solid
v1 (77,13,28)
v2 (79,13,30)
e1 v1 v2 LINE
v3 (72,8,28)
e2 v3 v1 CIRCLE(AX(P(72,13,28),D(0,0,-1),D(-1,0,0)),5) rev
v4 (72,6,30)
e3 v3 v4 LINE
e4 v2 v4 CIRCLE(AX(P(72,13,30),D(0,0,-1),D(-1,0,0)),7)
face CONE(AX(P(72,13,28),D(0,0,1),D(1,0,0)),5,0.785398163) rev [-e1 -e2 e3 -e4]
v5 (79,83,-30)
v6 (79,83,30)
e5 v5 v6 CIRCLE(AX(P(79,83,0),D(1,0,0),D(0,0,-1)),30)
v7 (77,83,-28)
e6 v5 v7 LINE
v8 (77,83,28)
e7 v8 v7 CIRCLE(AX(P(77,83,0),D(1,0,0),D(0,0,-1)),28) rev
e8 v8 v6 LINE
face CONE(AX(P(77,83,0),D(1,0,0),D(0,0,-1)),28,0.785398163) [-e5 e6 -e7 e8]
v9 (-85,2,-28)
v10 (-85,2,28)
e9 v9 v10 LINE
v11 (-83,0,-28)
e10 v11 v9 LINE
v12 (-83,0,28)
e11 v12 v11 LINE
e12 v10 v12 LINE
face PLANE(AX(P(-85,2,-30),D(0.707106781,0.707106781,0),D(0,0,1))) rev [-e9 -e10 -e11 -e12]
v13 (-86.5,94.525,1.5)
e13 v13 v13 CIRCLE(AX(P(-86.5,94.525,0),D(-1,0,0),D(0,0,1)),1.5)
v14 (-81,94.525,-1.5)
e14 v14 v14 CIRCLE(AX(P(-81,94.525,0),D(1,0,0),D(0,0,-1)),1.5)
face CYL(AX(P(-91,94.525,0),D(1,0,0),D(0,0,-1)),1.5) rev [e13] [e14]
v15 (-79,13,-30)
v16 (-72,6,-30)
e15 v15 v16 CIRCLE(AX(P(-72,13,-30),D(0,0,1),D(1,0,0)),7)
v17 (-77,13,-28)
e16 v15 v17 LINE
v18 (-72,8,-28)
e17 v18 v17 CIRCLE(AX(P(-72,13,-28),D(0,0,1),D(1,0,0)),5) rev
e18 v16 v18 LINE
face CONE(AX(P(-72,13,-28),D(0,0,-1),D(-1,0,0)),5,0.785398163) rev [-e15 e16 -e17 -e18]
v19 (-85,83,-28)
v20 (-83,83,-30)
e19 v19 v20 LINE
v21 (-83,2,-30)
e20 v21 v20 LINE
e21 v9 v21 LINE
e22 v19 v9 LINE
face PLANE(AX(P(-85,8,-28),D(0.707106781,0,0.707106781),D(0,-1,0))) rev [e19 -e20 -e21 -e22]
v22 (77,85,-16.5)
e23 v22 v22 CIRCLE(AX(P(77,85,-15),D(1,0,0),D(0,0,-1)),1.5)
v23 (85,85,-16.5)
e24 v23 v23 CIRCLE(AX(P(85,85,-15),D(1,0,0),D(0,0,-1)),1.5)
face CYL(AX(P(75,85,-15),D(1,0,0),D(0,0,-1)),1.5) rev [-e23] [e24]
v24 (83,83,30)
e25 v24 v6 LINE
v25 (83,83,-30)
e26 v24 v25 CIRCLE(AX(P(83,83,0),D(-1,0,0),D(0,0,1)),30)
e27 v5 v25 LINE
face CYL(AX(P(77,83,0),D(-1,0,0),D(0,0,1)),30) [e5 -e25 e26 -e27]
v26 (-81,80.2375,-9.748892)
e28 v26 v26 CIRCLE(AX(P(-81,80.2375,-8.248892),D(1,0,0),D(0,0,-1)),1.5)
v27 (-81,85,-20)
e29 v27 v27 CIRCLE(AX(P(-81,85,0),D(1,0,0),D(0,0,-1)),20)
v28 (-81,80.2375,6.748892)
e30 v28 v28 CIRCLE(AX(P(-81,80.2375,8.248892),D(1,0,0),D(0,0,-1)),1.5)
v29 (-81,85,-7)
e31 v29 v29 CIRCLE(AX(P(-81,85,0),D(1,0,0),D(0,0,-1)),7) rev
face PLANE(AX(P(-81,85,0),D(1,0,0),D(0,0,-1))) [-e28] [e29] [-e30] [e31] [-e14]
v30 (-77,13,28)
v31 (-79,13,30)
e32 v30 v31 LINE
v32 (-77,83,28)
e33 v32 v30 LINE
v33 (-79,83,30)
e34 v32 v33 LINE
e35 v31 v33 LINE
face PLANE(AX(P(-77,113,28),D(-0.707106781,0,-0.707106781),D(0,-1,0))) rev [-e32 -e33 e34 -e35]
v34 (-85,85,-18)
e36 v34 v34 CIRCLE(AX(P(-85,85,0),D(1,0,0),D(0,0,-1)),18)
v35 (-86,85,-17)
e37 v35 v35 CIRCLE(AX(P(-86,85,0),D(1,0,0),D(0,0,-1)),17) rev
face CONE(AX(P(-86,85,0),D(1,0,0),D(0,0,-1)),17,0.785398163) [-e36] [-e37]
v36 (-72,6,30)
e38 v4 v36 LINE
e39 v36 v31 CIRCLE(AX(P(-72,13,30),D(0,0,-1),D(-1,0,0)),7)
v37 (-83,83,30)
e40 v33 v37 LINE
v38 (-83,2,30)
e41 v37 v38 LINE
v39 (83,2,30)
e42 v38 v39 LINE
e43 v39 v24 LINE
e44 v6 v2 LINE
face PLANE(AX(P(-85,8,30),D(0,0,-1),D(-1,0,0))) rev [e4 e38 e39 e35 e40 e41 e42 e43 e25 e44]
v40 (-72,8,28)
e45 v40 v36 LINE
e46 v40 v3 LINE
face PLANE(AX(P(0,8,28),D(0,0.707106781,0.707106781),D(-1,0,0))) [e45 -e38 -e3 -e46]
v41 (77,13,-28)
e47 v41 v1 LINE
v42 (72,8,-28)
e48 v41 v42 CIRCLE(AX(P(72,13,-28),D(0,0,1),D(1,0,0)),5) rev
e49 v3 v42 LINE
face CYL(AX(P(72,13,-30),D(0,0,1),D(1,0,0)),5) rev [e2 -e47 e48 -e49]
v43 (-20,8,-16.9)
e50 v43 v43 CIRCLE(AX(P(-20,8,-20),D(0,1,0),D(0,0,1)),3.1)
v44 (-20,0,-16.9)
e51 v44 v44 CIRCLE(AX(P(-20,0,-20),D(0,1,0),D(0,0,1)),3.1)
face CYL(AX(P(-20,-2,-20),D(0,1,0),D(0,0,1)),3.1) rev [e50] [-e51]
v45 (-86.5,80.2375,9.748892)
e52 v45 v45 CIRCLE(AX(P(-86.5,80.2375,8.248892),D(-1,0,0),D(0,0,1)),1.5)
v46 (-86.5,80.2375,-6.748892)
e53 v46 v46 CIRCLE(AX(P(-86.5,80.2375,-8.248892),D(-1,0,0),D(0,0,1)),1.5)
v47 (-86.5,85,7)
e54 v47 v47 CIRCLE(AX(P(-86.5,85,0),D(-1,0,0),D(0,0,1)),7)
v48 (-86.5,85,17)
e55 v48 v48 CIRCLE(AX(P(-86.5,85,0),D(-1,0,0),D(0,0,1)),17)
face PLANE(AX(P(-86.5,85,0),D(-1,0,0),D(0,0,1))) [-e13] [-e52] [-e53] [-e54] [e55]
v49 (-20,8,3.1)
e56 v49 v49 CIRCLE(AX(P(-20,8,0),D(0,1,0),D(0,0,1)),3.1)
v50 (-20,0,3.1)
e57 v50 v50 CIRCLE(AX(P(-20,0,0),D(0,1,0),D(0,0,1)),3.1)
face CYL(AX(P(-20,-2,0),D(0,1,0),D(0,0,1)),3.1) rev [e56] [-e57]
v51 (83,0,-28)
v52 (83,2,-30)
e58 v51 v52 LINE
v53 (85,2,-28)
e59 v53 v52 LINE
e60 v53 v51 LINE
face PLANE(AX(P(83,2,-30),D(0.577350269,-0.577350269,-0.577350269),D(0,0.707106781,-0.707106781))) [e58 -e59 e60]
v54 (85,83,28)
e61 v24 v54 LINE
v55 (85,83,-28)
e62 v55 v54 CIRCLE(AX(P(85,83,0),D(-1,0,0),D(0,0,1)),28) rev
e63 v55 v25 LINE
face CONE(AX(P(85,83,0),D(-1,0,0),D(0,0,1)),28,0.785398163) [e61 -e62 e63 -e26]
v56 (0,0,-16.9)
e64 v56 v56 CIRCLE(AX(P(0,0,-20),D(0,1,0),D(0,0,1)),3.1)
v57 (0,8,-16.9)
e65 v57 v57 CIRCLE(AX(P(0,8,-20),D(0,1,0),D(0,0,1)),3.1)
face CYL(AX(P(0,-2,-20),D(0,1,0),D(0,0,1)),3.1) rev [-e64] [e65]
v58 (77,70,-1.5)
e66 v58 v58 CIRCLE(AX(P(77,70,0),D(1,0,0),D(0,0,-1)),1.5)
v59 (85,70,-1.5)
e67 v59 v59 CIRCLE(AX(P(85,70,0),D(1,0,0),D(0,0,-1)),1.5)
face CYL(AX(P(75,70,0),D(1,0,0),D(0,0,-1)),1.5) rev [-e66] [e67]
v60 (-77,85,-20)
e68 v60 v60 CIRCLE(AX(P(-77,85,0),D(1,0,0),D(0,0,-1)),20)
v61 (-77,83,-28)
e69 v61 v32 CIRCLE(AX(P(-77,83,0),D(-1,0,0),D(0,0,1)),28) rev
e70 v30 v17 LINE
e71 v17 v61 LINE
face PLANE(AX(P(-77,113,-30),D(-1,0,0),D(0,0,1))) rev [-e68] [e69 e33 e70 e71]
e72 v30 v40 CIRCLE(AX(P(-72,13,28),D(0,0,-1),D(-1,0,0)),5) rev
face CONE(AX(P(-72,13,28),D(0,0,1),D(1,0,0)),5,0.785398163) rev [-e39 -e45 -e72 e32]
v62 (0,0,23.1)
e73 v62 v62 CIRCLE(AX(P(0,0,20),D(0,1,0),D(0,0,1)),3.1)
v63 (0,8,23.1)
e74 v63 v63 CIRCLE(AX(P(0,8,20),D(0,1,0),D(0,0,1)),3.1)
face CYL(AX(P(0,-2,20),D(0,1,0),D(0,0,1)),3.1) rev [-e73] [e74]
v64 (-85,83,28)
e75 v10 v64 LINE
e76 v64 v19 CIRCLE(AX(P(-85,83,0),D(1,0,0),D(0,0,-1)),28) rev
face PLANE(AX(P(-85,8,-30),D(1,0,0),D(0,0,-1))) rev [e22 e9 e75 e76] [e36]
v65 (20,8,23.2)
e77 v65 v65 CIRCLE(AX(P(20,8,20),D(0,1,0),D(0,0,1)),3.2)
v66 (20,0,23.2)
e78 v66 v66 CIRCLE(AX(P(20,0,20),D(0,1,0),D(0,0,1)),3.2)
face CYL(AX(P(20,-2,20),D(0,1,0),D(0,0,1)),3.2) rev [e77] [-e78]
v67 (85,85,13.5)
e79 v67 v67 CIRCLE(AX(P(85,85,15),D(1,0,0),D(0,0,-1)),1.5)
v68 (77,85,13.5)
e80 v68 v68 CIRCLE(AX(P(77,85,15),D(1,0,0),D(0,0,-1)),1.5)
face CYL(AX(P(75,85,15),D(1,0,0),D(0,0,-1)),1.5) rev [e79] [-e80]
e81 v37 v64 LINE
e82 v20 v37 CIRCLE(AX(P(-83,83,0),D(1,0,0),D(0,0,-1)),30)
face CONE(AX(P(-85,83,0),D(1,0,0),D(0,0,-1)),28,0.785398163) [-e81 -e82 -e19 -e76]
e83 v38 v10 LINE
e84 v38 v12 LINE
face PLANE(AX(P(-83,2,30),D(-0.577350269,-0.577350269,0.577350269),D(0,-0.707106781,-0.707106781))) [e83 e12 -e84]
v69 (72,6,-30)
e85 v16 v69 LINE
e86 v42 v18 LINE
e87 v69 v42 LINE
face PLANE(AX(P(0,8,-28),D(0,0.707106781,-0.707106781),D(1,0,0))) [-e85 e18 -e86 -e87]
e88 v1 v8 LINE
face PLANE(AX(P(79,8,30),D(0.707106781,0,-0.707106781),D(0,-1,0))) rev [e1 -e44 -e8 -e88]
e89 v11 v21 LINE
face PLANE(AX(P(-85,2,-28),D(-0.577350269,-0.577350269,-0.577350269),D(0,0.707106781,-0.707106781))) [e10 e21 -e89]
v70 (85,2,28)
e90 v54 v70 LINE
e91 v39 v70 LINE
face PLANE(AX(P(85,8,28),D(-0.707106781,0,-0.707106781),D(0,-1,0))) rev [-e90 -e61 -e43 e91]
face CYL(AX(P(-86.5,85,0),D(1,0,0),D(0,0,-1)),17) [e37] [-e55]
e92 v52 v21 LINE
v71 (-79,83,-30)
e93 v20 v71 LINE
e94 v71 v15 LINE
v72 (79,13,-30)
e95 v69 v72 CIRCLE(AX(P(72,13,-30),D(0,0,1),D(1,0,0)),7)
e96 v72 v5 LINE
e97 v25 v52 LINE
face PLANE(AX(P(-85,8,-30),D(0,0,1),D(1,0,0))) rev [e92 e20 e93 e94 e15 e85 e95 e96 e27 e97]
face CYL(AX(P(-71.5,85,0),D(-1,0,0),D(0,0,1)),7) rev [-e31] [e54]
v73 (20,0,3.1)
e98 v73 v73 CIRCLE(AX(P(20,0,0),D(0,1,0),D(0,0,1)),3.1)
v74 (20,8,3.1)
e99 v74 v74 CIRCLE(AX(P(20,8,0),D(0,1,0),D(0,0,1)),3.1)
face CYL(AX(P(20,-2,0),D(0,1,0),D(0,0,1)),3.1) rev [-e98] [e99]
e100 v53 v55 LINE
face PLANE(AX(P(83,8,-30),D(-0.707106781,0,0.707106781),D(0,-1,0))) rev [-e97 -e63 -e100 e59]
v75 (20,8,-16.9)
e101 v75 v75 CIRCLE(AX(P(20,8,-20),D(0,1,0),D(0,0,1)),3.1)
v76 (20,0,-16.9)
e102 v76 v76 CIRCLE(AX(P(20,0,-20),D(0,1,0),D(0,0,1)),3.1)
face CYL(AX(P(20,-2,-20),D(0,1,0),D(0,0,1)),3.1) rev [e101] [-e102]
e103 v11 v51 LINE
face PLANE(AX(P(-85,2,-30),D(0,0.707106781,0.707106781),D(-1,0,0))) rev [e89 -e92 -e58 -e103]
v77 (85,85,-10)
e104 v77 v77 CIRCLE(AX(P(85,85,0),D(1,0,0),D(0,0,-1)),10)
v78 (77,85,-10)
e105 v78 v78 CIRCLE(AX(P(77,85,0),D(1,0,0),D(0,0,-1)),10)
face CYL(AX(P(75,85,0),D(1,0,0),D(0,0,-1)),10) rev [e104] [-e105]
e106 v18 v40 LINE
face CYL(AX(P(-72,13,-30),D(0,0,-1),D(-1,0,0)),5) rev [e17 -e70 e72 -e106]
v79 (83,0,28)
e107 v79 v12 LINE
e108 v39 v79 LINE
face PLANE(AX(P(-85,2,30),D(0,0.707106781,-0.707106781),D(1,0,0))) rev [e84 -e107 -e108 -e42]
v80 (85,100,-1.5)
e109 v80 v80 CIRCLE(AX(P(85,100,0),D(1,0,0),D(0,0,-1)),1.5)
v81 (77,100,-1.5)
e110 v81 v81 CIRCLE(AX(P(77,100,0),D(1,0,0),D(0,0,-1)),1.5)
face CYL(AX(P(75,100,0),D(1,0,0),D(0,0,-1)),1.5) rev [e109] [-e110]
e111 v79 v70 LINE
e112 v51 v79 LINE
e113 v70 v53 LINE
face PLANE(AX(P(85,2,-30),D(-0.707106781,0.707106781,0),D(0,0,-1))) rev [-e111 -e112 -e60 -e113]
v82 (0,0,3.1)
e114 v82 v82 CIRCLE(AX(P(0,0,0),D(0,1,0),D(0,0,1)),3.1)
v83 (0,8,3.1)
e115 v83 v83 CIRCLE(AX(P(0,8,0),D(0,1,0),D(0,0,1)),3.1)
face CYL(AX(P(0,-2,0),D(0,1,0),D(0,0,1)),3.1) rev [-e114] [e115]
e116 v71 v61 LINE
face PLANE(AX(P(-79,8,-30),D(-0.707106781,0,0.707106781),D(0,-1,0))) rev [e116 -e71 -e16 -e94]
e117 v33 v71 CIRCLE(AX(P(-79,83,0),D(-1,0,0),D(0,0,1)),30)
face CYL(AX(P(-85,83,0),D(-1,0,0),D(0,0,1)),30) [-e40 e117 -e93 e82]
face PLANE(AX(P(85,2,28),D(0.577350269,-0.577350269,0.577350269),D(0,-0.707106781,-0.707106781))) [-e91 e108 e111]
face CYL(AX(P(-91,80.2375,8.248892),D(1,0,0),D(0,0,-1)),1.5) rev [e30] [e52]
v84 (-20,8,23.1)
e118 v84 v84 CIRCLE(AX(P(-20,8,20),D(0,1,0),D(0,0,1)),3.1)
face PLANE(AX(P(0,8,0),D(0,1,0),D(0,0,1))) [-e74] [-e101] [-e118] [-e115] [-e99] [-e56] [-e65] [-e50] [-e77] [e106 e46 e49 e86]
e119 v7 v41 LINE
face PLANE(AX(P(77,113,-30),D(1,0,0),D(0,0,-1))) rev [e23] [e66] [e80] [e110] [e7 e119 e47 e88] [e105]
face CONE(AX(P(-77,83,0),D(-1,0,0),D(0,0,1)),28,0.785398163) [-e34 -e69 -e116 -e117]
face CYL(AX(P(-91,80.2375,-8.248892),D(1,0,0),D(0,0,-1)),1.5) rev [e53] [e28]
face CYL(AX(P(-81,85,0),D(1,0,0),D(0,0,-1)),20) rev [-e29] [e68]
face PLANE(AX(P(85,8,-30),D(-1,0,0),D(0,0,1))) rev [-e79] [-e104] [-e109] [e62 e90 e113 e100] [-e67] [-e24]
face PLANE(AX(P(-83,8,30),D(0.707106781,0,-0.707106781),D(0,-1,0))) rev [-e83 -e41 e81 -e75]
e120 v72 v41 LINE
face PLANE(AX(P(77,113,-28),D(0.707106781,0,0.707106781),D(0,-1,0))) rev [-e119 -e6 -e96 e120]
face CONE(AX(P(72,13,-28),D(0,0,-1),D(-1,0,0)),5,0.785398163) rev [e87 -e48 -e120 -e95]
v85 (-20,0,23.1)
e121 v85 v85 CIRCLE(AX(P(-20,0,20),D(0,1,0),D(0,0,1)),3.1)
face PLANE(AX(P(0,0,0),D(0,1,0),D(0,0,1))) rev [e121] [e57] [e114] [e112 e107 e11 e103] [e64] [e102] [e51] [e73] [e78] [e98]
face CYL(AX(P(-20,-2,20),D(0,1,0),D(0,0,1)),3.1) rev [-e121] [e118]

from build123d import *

# Parameters (mm, degrees)
SKETCH1_W           = 170
SKETCH1_H           = 60
BOSS_EXTRUDE1_DEPTH = 8
SKETCH2_W           = 8
SKETCH2_H           = 60
BOSS_EXTRUDE2_DEPTH = 105
SKETCH3_R           = 10
SKETCH3_R_2         = 1.5
CUT_EXTRUDE1_DEPTH  = 10
SKETCH5_R           = 17
BOSS_EXTRUDE3_DEPTH = 1.5
SKETCH6_R           = 7
CUT_EXTRUDE3_DEPTH  = 15
SKETCH7_R           = 20
CUT_EXTRUDE4_DEPTH  = 4
FILLET1_RADIUS      = 30
FILLET1_LENGTH      = 8
FILLET2_RADIUS      = 30
FILLET2_LENGTH      = 8
FILLET3_R           = 5
FILLET4_R           = 5
CHAMFER1_SIZE       = 2
SKETCH8_R           = 3.1
SKETCH8_R_2         = 3.2
CUT_EXTRUDE5_DEPTH  = 10
SKETCH10_R          = 1.5
CUT_EXTRUDE7_DEPTH  = 10
CHAMFER2_SIZE       = 1


with BuildPart() as part:
    # Sketch1 → Boss-Extrude1 (new body)
    with BuildSketch(Plane(origin=(0, 0, 0), x_dir=(1, 0, 0), z_dir=(0, 1, 0))):
        Rectangle(SKETCH1_W, SKETCH1_H)
    extrude(amount=BOSS_EXTRUDE1_DEPTH)

    # Sketch2 → Boss-Extrude2 (add)
    with BuildSketch(Plane(origin=(0, 8, 0), x_dir=(1, 0, 0), z_dir=(0, 1, 0))):
        with Locations((-81, 0)):
            Rectangle(SKETCH2_W, SKETCH2_H)
        with Locations((81, 0)):
            Rectangle(SKETCH2_W, SKETCH2_H)
    extrude(amount=BOSS_EXTRUDE2_DEPTH)

    # Sketch3 → Cut-Extrude1 (cut)
    with BuildSketch(Plane(origin=(85, 0, 0), x_dir=(0, 0, -1), z_dir=(1, 0, 0))):
        with Locations((0, 85)):
            Circle(SKETCH3_R)
        with Locations((0, 70)):
            Circle(SKETCH3_R_2)
        with Locations((0, 100)):
            Circle(SKETCH3_R_2)
        with Locations((-15, 85)):
            Circle(SKETCH3_R_2)
        with Locations((15, 85)):
            Circle(SKETCH3_R_2)
    extrude(amount=-CUT_EXTRUDE1_DEPTH, mode=Mode.SUBTRACT)

    # Sketch5 → Boss-Extrude3 (add)
    with BuildSketch(Plane.ZY.offset(85)):
        with Locations(Location((0, 85, 0), (0, 0, 180))):
            Circle(SKETCH5_R)
    extrude(amount=BOSS_EXTRUDE3_DEPTH)

    # Sketch6 → Cut-Extrude3 (cut)
    with BuildSketch(Plane.ZY.offset(86.5)):
        with Locations((0, 85)):
            Circle(SKETCH6_R)
    extrude(amount=-CUT_EXTRUDE3_DEPTH, mode=Mode.SUBTRACT)

    # Sketch7 → Cut-Extrude4 (cut)
    with BuildSketch(Plane(origin=(-77, 0, 0), x_dir=(0, 0, -1), z_dir=(1, 0, 0))):
        with Locations((0, 85)):
            Circle(SKETCH7_R)
    extrude(amount=-CUT_EXTRUDE4_DEPTH, mode=Mode.SUBTRACT)

    # Fillet1: full round fillet: the end face becomes a half cylinder, R = half its width
    fillet1_face = Plane((81, 113, 0), x_dir=(-1, 0, 0), z_dir=(0, 1, 0))  # on the end face: x along it, z out of the body
    fillet1_slab = fillet1_face.offset(-FILLET1_RADIUS / 2) * Box(FILLET1_LENGTH, 2 * FILLET1_RADIUS, FILLET1_RADIUS, mode=Mode.PRIVATE)  # the body's end, R deep
    fillet1_round = Plane((81, 83, 0), x_dir=(0, 1, 0), z_dir=(-1, 0, 0)) * Cylinder(FILLET1_RADIUS, FILLET1_LENGTH, mode=Mode.PRIVATE)  # its axis R under the face
    add(fillet1_slab - fillet1_round, mode=Mode.SUBTRACT)

    # Fillet2: full round fillet: the end face becomes a half cylinder, R = half its width
    fillet2_face = Plane((-81, 113, 0), x_dir=(1, 0, 0), z_dir=(0, 1, 0))  # on the end face: x along it, z out of the body
    fillet2_slab = fillet2_face.offset(-FILLET2_RADIUS / 2) * Box(FILLET2_LENGTH, 2 * FILLET2_RADIUS, FILLET2_RADIUS, mode=Mode.PRIVATE)  # the body's end, R deep
    fillet2_round = Plane((-81, 83, 0), x_dir=(0, 1, 0), z_dir=(1, 0, 0)) * Cylinder(FILLET2_RADIUS, FILLET2_LENGTH, mode=Mode.PRIVATE)  # its axis R under the face
    add(fillet2_slab - fillet2_round, mode=Mode.SUBTRACT)

    # Fillet3
    fillet3_edges = [part.edges().sort_by_distance(p)[0] for p in [
        (77, 8, 0),
    ]]
    fillet(fillet3_edges, radius=FILLET3_R)

    # Fillet4
    fillet4_edges = [part.edges().sort_by_distance(p)[0] for p in [
        (-77, 8, 0),
    ]]
    fillet(fillet4_edges, radius=FILLET4_R)

    # Chamfer1
    chamfer1_edges = [part.edges().sort_by_distance(p)[0] for p in [
        (75.535533906, 9.464466094, -30),
        (75.535533906, 9.464466094, 30),
        (0, 8, 30),
        (-75.535533906, 9.464466094, 30),
        (-75.535533906, 9.464466094, -30),
        (0, 0, -30),
        (85, 0, 0),
        (0, 0, 30),
        (-85, 0, 0),
        (77, 48, -30),
        (85, 41.5, -30),
        (85, 41.5, 30),
        (77, 48, 30),
        (77, 113, 0),
        (85, 113, 0),
        (-85, 41.5, -30),
        (-77, 48, -30),
        (-77, 48, 30),
        (-85, 41.5, 30),
        (-85, 113, 0),
        (-77, 113, 0),
        (0, 8, -30),
    ]]
    chamfer(chamfer1_edges, length=CHAMFER1_SIZE)

    # Sketch8 → Cut-Extrude5 (cut)
    with BuildSketch(Plane(origin=(0, 8, 0), x_dir=(1, 0, 0), z_dir=(0, 1, 0))):
        with Locations(Location((0, 0, 0), (0, 0, 270))):
            Circle(SKETCH8_R)
        with Locations(Location((0, 20, 0), (0, 0, 270))):
            Circle(SKETCH8_R)
        with Locations(Location((0, -20, 0), (0, 0, 270))):
            Circle(SKETCH8_R)
        with Locations(Location((-20, -20, 0), (0, 0, 270))):
            Circle(SKETCH8_R)
        with Locations(Location((-20, 20, 0), (0, 0, 270))):
            Circle(SKETCH8_R)
        with Locations(Location((-20, 0, 0), (0, 0, 270))):
            Circle(SKETCH8_R)
        with Locations(Location((20, -20, 0), (0, 0, 270))):
            Circle(SKETCH8_R_2)
        with Locations(Location((20, 0, 0), (0, 0, 270))):
            Circle(SKETCH8_R)
        with Locations(Location((20, 20, 0), (0, 0, 270))):
            Circle(SKETCH8_R)
    extrude(amount=-CUT_EXTRUDE5_DEPTH, mode=Mode.SUBTRACT)

    # Sketch10 → Cut-Extrude7 (cut)
    with BuildSketch(Plane(origin=(-81, 0, 0), x_dir=(0, 0, -1), z_dir=(1, 0, 0))):
        with Locations((0, 94.525)):
            Circle(SKETCH10_R)
        with Locations((8.248891971, 80.2375)):
            Circle(SKETCH10_R)
        with Locations((-8.248891971, 80.2375)):
            Circle(SKETCH10_R)
    extrude(amount=-CUT_EXTRUDE7_DEPTH, mode=Mode.SUBTRACT)

    # Chamfer2
    chamfer2_edges = [part.edges().sort_by_distance(p)[0] for p in [
        (-85, 85, 17),
    ]]
    chamfer(chamfer2_edges, length=CHAMFER2_SIZE)


solid = part.part
